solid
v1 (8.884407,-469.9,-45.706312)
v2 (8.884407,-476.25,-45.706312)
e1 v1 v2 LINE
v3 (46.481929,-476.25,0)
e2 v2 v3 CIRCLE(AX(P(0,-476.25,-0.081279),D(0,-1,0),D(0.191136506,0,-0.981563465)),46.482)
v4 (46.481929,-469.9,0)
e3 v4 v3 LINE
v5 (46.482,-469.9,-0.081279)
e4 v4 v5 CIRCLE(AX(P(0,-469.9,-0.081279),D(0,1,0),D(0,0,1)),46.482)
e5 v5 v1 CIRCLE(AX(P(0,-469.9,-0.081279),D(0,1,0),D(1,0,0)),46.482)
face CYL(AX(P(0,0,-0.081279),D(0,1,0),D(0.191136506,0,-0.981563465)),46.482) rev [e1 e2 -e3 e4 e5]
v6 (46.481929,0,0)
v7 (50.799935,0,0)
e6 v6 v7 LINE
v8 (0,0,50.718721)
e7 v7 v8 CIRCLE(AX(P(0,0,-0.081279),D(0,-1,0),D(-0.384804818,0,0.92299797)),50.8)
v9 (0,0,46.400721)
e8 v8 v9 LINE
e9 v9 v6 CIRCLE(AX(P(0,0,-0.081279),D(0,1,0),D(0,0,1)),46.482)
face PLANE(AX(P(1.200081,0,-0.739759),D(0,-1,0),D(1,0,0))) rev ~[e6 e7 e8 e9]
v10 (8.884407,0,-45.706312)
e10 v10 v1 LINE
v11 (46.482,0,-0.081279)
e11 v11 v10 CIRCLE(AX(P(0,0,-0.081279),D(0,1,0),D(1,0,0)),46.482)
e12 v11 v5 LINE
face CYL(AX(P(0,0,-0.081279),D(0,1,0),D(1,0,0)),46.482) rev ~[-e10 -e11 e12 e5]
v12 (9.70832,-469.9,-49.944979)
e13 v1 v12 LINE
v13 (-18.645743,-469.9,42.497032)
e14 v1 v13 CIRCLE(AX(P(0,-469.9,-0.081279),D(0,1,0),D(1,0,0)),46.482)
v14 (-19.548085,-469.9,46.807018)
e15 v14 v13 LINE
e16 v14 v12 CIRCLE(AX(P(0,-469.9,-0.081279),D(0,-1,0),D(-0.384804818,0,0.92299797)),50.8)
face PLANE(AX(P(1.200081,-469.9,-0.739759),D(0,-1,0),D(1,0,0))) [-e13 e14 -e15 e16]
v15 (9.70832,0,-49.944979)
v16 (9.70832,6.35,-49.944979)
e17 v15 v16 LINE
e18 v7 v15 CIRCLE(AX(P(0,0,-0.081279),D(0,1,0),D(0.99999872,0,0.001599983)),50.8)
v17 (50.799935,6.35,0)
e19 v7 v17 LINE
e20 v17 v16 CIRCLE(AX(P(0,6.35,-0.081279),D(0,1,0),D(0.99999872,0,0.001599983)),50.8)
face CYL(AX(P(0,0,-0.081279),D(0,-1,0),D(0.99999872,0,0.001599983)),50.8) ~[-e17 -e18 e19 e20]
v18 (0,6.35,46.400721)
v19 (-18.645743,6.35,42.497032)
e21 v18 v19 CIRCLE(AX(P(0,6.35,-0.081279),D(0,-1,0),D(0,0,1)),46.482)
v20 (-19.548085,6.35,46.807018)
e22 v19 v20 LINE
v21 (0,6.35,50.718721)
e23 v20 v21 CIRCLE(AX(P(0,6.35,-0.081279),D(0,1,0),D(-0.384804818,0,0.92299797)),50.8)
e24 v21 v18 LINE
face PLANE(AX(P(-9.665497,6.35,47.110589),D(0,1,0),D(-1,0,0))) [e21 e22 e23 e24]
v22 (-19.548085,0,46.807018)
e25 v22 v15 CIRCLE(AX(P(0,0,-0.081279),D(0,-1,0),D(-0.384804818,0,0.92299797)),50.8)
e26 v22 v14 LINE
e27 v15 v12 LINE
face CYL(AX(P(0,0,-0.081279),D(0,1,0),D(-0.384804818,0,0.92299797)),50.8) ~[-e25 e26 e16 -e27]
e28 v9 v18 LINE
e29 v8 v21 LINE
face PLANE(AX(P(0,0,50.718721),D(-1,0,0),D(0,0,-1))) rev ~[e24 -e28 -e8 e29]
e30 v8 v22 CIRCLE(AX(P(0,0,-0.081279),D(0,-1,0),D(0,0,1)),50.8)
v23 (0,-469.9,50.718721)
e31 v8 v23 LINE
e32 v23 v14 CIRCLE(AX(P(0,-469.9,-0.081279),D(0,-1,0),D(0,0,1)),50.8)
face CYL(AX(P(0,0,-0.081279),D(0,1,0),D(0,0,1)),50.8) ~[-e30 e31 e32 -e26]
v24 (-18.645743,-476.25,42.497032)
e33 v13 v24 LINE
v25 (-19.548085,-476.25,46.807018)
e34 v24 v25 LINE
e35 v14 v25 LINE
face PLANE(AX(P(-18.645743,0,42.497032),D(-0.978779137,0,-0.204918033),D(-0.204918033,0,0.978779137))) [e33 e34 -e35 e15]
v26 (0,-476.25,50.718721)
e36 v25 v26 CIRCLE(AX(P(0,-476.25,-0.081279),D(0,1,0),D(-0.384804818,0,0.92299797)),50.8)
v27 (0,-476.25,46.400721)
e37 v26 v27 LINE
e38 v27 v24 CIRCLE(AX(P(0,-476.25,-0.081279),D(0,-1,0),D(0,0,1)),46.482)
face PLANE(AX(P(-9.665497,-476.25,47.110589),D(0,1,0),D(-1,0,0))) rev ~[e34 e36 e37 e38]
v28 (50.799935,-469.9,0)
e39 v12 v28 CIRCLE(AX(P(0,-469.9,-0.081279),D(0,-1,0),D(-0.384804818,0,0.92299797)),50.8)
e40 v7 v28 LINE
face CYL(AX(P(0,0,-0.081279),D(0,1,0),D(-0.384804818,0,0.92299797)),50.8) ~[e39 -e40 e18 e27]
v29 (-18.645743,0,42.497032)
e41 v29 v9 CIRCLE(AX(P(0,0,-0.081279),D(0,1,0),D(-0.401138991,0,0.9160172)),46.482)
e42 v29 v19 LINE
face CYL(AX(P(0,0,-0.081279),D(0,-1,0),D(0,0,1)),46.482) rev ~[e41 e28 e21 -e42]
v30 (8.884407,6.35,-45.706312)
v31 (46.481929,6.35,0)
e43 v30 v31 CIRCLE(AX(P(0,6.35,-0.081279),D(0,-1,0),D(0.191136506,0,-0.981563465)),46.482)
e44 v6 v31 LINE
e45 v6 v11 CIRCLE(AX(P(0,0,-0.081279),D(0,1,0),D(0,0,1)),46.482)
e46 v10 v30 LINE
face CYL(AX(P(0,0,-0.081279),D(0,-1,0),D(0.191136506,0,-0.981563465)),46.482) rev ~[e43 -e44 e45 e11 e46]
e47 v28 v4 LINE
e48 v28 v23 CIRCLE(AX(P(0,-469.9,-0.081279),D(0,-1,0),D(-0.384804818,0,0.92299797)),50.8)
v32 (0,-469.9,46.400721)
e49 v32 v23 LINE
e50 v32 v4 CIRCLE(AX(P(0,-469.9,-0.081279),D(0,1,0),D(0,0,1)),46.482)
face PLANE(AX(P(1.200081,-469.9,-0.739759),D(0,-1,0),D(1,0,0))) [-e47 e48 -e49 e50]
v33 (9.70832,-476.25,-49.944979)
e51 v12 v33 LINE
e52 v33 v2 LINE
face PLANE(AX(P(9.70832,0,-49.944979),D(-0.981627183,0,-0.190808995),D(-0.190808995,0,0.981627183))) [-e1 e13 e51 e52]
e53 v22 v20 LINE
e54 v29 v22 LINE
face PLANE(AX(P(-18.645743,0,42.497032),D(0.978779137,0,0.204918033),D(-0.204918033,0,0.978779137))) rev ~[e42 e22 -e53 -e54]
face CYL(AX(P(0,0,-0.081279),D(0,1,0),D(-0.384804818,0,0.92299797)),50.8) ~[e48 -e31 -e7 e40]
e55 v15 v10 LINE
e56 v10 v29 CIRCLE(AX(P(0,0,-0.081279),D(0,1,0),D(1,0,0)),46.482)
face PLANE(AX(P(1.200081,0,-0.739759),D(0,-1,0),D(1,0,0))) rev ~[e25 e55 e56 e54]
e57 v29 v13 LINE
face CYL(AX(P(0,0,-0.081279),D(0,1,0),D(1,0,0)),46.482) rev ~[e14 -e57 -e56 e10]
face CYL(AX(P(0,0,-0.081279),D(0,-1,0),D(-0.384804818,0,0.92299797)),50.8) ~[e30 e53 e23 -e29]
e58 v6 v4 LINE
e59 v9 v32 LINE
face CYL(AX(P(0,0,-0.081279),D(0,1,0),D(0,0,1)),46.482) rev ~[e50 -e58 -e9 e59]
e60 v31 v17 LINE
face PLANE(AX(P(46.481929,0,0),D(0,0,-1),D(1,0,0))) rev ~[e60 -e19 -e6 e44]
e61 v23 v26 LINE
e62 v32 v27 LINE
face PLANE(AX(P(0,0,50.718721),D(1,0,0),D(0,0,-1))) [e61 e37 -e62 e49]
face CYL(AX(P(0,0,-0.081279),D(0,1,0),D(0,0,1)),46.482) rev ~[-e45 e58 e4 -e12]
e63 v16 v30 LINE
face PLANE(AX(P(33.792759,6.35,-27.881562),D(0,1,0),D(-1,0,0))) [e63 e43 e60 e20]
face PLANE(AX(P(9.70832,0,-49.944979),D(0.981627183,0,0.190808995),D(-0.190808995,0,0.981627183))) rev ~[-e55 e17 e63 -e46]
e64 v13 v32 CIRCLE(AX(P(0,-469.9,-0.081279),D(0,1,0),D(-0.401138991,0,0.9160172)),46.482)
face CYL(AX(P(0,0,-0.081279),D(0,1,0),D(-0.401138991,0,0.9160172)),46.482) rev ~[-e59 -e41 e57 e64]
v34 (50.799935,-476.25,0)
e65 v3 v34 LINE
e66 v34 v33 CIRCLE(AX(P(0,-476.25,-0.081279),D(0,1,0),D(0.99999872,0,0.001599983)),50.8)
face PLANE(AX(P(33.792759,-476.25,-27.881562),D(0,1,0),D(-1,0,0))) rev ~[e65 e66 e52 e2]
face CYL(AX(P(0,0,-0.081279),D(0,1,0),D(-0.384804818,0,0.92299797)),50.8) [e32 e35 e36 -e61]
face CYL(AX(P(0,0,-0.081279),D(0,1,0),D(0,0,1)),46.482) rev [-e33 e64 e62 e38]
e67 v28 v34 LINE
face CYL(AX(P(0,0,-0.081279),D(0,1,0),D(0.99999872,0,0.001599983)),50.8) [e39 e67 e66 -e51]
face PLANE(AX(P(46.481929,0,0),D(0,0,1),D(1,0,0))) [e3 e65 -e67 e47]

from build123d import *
from build123d import SkipClean  # not in build123d's __all__

# Parameters (mm, degrees)
F1_DEPTH      = 469.9
F3_DEPTH      = 6.35
F3_DEPTH_BACK = 476.25


with BuildPart() as f1:
    # F0 (on Front) → F1 (new body)
    with BuildSketch(Plane.XZ):
        with BuildLine():
            ThreePointArc((0, 46.4007208579), (32.8677374031, 32.786458261), (46.482, -0.0812791421))
            ThreePointArc((46.482, -0.0812791421), (-25.4350635734, -38.9867268971), (-18.6457425678, 42.4970323333))
            Line((-18.6457425678, 42.4970323333), (-19.5480847725, 46.8070177104))
            ThreePointArc((-19.5480847725, 46.8070177104), (-28.1744325014, -42.3523254175), (50.8, -0.0812791421))
            ThreePointArc((50.8, -0.0812791421), (35.9210244843, 35.8397453422), (0, 50.7187208579))
            Line((0, 50.7187208579), (0, 46.4007208579))
        make_face()
        with BuildLine():
            ThreePointArc((-18.6457425678, 42.4970323333), (-9.525, 45.4143327232), (0, 46.4007208579))
            Line((0, 46.4007208579), (0, 50.7187208579))
            ThreePointArc((0, 50.7187208579), (-9.9678111914, 49.731196605), (-19.5480847725, 46.8070177104))
            Line((-19.5480847725, 46.8070177104), (-18.6457425678, 42.4970323333))
        make_face()
    extrude(amount=F1_DEPTH)

    # F2 (on face) → F3 (join, two sides)
    with BuildSketch(Plane(origin=(0, 0, 0), x_dir=(-1, 0, 0), z_dir=(0, 1, 0))) as f3_sk:
        with BuildLine():
            ThreePointArc((19.5480847725, 46.8070177104), (9.9678111914, 49.731196605), (0, 50.7187208579))
            Line((0, 50.7187208579), (0, 46.4007208579))
            ThreePointArc((0, 46.4007208579), (9.525, 45.4143327232), (18.6457425678, 42.4970323333))
            Line((18.6457425678, 42.4970323333), (19.5480847725, 46.8070177104))
        make_face()
        with BuildLine():
            Line((-46.481928937, 0), (-50.7999349773, 0))
            ThreePointArc((-50.7999349773, 0), (-39.2292934041, -32.3566960877), (-9.7083203647, -49.9449785205))
            Line((-9.7083203647, -49.9449785205), (-8.8844070807, -45.7063121265))
            ThreePointArc((-8.8844070807, -45.7063121265), (-35.897416802, -29.610108969), (-46.481928937, 0))
        make_face()
    with SkipClean():  # cleaning this boolean's faces spoils the solid; the shape is the same uncleaned
        extrude(amount=F3_DEPTH)
        extrude(f3_sk.sketch, amount=-F3_DEPTH_BACK)


solid = f1.part
